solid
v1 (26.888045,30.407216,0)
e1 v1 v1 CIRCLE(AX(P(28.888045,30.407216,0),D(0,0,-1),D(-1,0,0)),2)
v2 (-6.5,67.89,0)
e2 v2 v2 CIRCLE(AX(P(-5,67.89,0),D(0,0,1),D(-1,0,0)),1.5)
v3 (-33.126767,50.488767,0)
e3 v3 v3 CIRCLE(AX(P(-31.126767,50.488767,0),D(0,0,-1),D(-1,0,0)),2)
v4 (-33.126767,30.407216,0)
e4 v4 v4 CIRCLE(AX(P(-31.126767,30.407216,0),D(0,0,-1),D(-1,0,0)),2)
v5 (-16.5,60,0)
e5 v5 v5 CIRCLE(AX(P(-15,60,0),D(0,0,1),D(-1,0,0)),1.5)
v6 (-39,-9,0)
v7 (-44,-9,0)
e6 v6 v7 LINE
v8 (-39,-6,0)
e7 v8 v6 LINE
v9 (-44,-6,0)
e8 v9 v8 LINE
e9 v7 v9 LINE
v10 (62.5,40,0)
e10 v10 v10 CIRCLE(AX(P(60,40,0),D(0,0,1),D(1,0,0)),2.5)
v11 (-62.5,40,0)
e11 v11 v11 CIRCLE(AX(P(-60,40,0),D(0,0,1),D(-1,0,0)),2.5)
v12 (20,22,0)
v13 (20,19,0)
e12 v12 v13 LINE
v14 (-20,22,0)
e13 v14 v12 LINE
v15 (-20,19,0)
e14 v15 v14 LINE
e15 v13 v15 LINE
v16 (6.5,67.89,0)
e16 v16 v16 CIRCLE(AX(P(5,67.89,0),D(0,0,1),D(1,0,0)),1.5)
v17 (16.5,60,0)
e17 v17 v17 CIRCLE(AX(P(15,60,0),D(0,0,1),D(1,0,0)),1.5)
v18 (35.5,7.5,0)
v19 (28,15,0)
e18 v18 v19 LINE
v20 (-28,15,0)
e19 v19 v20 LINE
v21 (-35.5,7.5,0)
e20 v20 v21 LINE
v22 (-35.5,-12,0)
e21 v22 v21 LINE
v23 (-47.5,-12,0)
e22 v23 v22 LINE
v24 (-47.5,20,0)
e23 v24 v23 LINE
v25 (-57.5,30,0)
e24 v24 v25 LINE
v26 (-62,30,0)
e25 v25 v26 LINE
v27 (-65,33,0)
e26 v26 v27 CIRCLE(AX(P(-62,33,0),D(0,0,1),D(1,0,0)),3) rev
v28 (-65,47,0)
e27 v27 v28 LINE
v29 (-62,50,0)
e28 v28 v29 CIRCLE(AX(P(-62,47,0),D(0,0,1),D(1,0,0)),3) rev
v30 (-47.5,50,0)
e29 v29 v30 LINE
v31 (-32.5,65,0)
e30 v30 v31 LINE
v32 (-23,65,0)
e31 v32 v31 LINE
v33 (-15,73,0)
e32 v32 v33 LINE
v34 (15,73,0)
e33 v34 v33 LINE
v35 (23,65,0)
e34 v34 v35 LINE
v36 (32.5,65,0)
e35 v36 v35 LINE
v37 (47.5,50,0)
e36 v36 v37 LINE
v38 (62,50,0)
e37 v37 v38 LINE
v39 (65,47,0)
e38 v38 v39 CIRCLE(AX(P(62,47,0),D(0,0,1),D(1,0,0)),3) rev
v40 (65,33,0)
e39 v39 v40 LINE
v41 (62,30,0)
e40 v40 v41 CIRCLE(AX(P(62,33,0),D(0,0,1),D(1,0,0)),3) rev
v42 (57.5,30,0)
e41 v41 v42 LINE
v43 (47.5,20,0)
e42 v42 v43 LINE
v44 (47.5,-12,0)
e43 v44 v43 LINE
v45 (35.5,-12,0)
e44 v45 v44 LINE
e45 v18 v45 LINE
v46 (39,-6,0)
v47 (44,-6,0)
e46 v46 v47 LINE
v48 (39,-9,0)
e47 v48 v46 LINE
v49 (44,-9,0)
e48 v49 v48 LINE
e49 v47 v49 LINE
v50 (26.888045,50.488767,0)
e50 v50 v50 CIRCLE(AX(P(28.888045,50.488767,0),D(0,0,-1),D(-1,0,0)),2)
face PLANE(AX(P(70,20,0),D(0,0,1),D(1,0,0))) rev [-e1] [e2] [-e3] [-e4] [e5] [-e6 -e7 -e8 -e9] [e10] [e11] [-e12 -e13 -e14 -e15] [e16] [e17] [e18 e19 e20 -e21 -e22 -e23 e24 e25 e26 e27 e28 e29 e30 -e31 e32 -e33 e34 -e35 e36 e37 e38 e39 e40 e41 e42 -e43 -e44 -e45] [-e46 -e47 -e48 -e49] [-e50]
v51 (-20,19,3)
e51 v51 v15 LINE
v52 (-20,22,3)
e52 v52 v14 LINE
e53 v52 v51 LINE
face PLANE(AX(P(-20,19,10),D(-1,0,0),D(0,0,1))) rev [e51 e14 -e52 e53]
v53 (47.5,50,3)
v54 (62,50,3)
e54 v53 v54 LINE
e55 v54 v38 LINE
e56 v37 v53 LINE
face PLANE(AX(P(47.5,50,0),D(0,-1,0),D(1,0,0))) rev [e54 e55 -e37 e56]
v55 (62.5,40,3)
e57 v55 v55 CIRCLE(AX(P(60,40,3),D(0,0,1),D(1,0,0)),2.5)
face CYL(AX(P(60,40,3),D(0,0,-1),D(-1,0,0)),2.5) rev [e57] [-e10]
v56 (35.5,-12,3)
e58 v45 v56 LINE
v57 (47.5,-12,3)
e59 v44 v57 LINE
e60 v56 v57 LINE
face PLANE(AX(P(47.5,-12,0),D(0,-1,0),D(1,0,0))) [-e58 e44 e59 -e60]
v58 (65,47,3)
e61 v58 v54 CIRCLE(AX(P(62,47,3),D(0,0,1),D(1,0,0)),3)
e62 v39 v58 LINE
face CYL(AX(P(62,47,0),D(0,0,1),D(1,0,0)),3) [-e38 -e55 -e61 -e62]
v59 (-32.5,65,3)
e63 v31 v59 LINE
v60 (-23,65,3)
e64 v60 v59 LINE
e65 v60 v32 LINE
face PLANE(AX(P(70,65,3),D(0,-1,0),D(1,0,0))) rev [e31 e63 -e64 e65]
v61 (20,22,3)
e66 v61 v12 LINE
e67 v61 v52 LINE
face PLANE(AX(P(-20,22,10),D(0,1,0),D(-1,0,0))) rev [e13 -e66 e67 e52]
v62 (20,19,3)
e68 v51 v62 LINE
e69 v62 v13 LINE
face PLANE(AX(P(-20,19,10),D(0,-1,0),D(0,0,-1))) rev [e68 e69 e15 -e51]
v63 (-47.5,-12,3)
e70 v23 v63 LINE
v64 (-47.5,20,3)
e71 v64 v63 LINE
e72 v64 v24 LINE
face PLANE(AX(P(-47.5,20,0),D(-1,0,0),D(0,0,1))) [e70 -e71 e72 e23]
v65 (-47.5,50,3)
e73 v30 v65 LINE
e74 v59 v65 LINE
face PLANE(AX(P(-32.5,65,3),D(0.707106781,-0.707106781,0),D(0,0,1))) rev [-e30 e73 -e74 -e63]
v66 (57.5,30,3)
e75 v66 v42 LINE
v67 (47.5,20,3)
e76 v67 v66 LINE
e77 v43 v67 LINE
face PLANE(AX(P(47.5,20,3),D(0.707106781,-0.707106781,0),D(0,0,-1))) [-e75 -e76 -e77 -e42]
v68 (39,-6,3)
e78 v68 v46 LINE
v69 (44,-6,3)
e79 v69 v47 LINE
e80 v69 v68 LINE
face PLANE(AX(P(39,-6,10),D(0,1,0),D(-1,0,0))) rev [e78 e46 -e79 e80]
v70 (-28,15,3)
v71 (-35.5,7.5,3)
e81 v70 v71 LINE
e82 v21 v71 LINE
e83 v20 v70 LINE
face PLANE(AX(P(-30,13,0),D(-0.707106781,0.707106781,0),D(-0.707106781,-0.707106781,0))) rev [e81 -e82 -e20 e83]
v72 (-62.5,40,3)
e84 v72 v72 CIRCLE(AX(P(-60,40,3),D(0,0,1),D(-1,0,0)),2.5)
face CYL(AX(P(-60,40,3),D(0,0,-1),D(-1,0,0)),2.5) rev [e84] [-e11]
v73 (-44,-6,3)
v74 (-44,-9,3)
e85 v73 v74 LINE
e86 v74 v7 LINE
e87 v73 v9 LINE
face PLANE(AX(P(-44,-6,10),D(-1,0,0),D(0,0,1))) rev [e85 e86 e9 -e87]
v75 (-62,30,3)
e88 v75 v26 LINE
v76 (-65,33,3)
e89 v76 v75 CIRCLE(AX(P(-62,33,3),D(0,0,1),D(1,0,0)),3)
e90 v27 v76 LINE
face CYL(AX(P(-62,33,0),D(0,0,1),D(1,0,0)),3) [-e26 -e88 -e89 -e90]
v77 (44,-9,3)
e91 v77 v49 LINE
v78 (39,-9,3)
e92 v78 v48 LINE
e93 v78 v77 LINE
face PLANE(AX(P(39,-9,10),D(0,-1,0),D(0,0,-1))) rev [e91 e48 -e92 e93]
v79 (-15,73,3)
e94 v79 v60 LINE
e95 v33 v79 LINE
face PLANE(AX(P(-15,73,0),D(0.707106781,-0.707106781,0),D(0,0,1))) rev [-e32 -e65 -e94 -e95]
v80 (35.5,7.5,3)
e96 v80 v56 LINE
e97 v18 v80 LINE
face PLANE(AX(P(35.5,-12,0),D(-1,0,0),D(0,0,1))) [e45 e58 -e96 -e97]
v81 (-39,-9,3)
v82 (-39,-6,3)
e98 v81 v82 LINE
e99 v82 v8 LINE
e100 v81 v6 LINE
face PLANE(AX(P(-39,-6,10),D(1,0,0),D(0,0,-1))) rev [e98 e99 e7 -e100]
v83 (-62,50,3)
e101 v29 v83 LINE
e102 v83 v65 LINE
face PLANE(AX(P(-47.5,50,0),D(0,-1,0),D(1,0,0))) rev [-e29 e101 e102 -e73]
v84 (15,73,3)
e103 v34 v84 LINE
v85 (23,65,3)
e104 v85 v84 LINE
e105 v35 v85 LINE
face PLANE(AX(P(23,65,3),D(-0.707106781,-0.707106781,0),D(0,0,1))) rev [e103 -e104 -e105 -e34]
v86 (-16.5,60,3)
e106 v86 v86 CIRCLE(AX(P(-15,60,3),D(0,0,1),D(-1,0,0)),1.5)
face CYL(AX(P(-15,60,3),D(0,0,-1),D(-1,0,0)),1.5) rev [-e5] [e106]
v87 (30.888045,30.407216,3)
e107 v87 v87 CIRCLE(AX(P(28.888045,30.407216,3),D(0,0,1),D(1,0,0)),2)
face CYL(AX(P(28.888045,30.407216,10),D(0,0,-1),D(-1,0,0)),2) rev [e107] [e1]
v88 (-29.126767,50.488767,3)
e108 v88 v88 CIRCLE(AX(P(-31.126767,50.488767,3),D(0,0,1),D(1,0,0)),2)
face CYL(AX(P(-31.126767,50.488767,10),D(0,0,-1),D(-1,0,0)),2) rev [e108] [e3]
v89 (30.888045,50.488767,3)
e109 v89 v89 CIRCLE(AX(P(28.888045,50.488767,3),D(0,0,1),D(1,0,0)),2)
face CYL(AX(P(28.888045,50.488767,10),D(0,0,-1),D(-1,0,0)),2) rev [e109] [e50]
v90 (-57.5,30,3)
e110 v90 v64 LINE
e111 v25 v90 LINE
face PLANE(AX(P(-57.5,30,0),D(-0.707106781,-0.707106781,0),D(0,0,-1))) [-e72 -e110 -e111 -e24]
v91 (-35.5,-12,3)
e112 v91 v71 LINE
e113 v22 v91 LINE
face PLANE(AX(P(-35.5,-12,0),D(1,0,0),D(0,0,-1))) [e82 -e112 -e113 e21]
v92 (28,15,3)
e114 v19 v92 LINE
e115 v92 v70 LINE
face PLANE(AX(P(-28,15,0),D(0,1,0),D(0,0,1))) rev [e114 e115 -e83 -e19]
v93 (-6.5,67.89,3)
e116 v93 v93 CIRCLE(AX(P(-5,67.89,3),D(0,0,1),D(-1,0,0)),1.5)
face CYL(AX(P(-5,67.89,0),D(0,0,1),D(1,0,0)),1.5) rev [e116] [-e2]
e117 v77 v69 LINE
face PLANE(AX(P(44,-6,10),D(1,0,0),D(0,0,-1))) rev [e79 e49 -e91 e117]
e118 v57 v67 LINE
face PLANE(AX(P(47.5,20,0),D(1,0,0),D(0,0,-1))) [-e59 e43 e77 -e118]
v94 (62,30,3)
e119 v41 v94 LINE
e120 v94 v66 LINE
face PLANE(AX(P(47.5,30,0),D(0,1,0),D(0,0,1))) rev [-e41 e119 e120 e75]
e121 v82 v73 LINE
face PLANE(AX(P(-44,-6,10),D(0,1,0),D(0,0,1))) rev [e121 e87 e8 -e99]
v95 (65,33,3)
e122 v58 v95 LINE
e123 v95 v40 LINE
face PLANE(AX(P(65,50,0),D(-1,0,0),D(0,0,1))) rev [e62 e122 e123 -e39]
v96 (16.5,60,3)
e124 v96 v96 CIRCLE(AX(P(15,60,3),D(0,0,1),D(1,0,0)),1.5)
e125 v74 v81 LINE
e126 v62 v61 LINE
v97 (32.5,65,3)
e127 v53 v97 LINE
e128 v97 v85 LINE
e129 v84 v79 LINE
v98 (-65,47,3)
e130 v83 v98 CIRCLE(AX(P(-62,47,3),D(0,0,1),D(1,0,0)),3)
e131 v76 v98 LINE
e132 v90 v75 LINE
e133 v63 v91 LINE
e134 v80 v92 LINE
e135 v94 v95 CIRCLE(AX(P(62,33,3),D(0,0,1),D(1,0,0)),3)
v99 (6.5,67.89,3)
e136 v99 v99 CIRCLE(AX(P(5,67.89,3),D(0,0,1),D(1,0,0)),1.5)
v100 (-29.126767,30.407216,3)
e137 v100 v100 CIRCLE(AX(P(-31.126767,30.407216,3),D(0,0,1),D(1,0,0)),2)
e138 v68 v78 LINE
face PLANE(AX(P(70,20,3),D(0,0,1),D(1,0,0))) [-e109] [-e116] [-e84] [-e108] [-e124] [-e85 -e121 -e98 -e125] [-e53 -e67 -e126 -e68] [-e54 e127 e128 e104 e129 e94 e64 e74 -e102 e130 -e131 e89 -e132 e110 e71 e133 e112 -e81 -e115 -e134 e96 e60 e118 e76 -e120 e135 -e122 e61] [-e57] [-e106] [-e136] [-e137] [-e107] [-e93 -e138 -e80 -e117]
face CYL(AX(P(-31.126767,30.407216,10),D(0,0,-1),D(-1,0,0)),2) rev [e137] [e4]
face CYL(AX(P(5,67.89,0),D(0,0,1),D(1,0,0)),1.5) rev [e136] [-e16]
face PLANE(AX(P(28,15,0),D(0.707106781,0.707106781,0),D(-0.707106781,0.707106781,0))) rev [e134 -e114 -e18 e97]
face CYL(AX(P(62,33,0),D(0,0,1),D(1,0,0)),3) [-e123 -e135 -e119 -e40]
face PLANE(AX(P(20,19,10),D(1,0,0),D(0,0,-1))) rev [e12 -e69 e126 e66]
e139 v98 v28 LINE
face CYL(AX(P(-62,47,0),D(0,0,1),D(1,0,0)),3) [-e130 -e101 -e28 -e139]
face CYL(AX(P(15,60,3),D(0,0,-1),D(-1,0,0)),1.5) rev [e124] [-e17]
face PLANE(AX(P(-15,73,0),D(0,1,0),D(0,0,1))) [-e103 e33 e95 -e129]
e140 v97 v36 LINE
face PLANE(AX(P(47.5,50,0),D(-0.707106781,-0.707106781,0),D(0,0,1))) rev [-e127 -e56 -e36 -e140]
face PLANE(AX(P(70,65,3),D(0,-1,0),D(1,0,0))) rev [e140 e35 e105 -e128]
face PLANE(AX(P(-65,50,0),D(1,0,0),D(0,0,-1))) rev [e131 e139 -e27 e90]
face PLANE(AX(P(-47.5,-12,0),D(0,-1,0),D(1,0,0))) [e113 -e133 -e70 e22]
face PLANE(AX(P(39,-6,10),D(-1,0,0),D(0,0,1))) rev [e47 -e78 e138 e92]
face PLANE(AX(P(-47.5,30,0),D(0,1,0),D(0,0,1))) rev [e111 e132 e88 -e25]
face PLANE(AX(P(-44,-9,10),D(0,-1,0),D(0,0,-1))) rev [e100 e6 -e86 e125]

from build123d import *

# Parameters (mm, degrees)
SKETCH1_R           = 1.5
SKETCH1_R_2         = 2.5
BOSS_EXTRUDE1_DEPTH = 3
CUT_EXTRUDE1_DEPTH  = 3
FILLET1_R           = 3
CHAMFER4_SIZE       = 15
CHAMFER5_SIZE       = 10
SKETCH13_W          = 30
SKETCH13_H          = 8
BOSS_EXTRUDE5_DEPTH = 3
SKETCH8_W           = 95
SKETCH8_H           = 65.304735008
CUT_EXTRUDE5_DEPTH  = 10
SKETCH11_W          = 95
SKETCH11_H          = 7
BOSS_EXTRUDE3_DEPTH = 3
SKETCH10_R          = 1.5
CUT_EXTRUDE6_DEPTH  = 3
BOSS_EXTRUDE4_DEPTH = 3
CHAMFER6_SIZE       = 8
SKETCH17_R          = 2
CUT_EXTRUDE9_DEPTH  = 10
SKETCH15_W          = 40
SKETCH15_H          = 3
CUT_EXTRUDE8_DEPTH  = 10
BOSS_EXTRUDE6_START = -3
BOSS_EXTRUDE6_DEPTH = 3
SKETCH18_W          = 5
SKETCH18_H          = 3
CUT_EXTRUDE11_DEPTH = 10


with BuildPart() as part:
    # Sketch1 → Boss-Extrude1 (new body)
    with BuildSketch(Plane.XY):
        with BuildLine():
            Line((40.5, -40), (44.5, -40))
            Line((44.5, -40), (47.5, -37))
            Line((47.5, -37), (47.5, 10))
            Line((47.5, 10), (47.5, 15))
            Line((47.5, 15), (52.5, 15))
            Line((52.5, 15), (70, 15))
            ThreePointArc((70, 15), (73.535533906, 16.464466094), (75, 20))
            Line((75, 20), (75, 60))
            ThreePointArc((75, 60), (73.535533906, 63.535533906), (70, 65))
            Line((70, 65), (-70, 65))
            ThreePointArc((-70, 65), (-73.535533906, 63.535533906), (-75, 60))
            Line((-75, 60), (-75, 20))
            ThreePointArc((-75, 20), (-73.535533906, 16.464466094), (-70, 15))
            Line((-70, 15), (-52.5, 15))
            Line((-52.5, 15), (-47.5, 15))
            Line((-47.5, 15), (-47.5, 10))
            Line((-47.5, 10), (-47.5, -37))
            Line((-47.5, -37), (-44.5, -40))
            Line((-44.5, -40), (-40.5, -40))
            Line((-40.5, -40), (-37.5, -37))
            Line((-37.5, -37), (-37.5, 10))
            ThreePointArc((-37.5, 10), (-36.035533906, 13.535533906), (-32.5, 15))
            Line((-32.5, 15), (32.5, 15))
            ThreePointArc((32.5, 15), (36.035533906, 13.535533906), (37.5, 10))
            Line((37.5, 10), (37.5, -37))
            Line((37.5, -37), (40.5, -40))
        make_face()
        with Locations((-42.5, -20)):
            Circle(SKETCH1_R, mode=Mode.SUBTRACT)
        with Locations((-42.5, -35)):
            Circle(SKETCH1_R, mode=Mode.SUBTRACT)
        with Locations((42.5, -20)):
            Circle(SKETCH1_R, mode=Mode.SUBTRACT)
        with Locations((42.5, -35)):
            Circle(SKETCH1_R, mode=Mode.SUBTRACT)
        with Locations((60, 40)):
            Circle(SKETCH1_R_2, mode=Mode.SUBTRACT)
        with Locations((15, 60)):
            Circle(SKETCH1_R, mode=Mode.SUBTRACT)
        with Locations(Location((-15, 60, 0), (0, 0, 180))):
            Circle(SKETCH1_R, mode=Mode.SUBTRACT)
        with Locations(Location((-60, 40, 0), (0, 0, 180))):
            Circle(SKETCH1_R_2, mode=Mode.SUBTRACT)
    extrude(amount=BOSS_EXTRUDE1_DEPTH)

    # Sketch3 → Cut-Extrude1 (cut)
    with BuildSketch(Plane.XY.offset(3)):
        Polygon((65, 50), (65, 30), (47.5, 30), (47.5, 15), (75, 15), (75, 23.034767996), (75, 32.364095159), (75, 65), (47.5, 65), (47.5, 50), align=None)
        Polygon((-47.5, 65), (-75, 65), (-75, 32.364095159), (-75, 23.034767996), (-75, 15), (-47.5, 15), (-47.5, 30), (-65, 30), (-65, 50), (-47.5, 50), align=None)
    extrude(amount=-CUT_EXTRUDE1_DEPTH, mode=Mode.SUBTRACT)

    # Fillet1
    fillet1_edges = [part.edges().sort_by_distance(p)[0] for p in [
        (65, 50, 1.5),
        (65, 30, 1.5),
        (-65, 50, 1.5),
        (-65, 30, 1.5),
    ]]
    fillet(fillet1_edges, radius=FILLET1_R)

    # Chamfer4
    chamfer4_edges = [part.edges().sort_by_distance(p)[0] for p in [
        (47.5, 65, 1.5),
        (-47.5, 65, 1.5),
    ]]
    chamfer(chamfer4_edges, length=CHAMFER4_SIZE - 0.0001)  # a hair under: the kernel refuses the full size

    # Chamfer5
    chamfer5_edges = [part.edges().sort_by_distance(p)[0] for p in [
        (47.5, 30, 1.5),
        (-47.5, 30, 1.5),
    ]]
    chamfer(chamfer5_edges, length=CHAMFER5_SIZE)

    # Sketch13 → Boss-Extrude5 (add)
    with BuildSketch(Plane.XY.offset(3)):
        with Locations((0, 69)):
            Rectangle(SKETCH13_W, SKETCH13_H)
    extrude(amount=-BOSS_EXTRUDE5_DEPTH)

    # Sketch8 → Cut-Extrude5 (cut)
    with BuildSketch(Plane.XY.offset(3)):
        with Locations((0, -12.652367504)):
            Rectangle(SKETCH8_W, SKETCH8_H)
    extrude(amount=-CUT_EXTRUDE5_DEPTH, mode=Mode.SUBTRACT)

    # Sketch11 → Boss-Extrude3 (add)
    with BuildSketch(Plane.XY.offset(3)):
        with Locations((0, 16.5)):
            Rectangle(SKETCH11_W, SKETCH11_H)
    extrude(amount=-BOSS_EXTRUDE3_DEPTH)

    # Sketch10 → Cut-Extrude6 (cut)
    with BuildSketch(Plane.XY.offset(3)):
        with Locations((5, 67.89)):
            Circle(SKETCH10_R)
        with Locations(Location((-5, 67.89, 0), (0, 0, 180))):
            Circle(SKETCH10_R)
        with Locations((-5, 18.11)):
            Circle(SKETCH10_R)
        with Locations(Location((5, 18.11, 0), (0, 0, 180))):
            Circle(SKETCH10_R)
        Polygon((-30, 13), (-28, 15), (28, 15), (30, 13), align=None)
    extrude(amount=-CUT_EXTRUDE6_DEPTH, mode=Mode.SUBTRACT)

    # Sketch12 → Boss-Extrude4 (add)
    with BuildSketch(Plane.XY.offset(3)):
        Polygon((47.5, 13), (47.5, -12), (35.5, -12), (35.5, 7.5), (30, 13), (35.5, 13), align=None)
        Polygon((-35.5, 13), (-47.5, 13), (-47.5, -12), (-35.5, -12), (-35.5, 7.5), (-30, 13), align=None)
    extrude(amount=-BOSS_EXTRUDE4_DEPTH)

    # Chamfer6
    chamfer6_edges = [part.edges().sort_by_distance(p)[0] for p in [
        (15, 65, 1.5),
        (-15, 65, 1.5),
    ]]
    chamfer(chamfer6_edges, length=CHAMFER6_SIZE - 0.0001)  # a hair under: the kernel refuses the full size

    # Sketch17 → Cut-Extrude9 (cut)
    with BuildSketch(Plane(origin=(0, 0, 0), x_dir=(-1, 0, 0), z_dir=(0, 0, -1))):
        with Locations((-28.88804467, 50.488766948)):
            Circle(SKETCH17_R)
        with Locations((-28.88804467, 30.407216077)):
            Circle(SKETCH17_R)
        with Locations((31.126767325, 30.407216077)):
            Circle(SKETCH17_R)
        with Locations((31.126767325, 50.488766948)):
            Circle(SKETCH17_R)
    extrude(amount=-CUT_EXTRUDE9_DEPTH, mode=Mode.SUBTRACT)

    # Sketch15 → Cut-Extrude8 (cut)
    with BuildSketch(Plane(origin=(0, 0, 0), x_dir=(-1, 0, 0), z_dir=(0, 0, -1))):
        with Locations((0, 20.5)):
            Rectangle(SKETCH15_W, SKETCH15_H)
    extrude(amount=-CUT_EXTRUDE8_DEPTH, mode=Mode.SUBTRACT)

    # Sketch16 → Boss-Extrude6 (add)
    with BuildSketch(Plane(origin=(0, 0, 0), x_dir=(-1, 0, 0), z_dir=(0, 0, -1)).offset(BOSS_EXTRUDE6_START)):
        with BuildLine():
            Line((3.792564702, 19), (6.207435298, 19))
            ThreePointArc((6.207435298, 19), (5, 16.61), (3.792564702, 19))
        make_face()
        with BuildLine():
            Line((-6.207435298, 19), (-3.792564702, 19))
            ThreePointArc((-3.792564702, 19), (-5, 16.61), (-6.207435298, 19))
        make_face()
    extrude(amount=BOSS_EXTRUDE6_DEPTH)

    # Sketch18 → Cut-Extrude11 (cut)
    with BuildSketch(Plane(origin=(0, 0, 0), x_dir=(-1, 0, 0), z_dir=(0, 0, -1))):
        with Locations((-131.776111861, 19.947341704)):
            Rectangle(SKETCH18_W, SKETCH18_H)
        with Locations((-41.5, -7.5)):
            Rectangle(SKETCH18_W, SKETCH18_H)
        with Locations((41.5, -7.5)):
            Rectangle(SKETCH18_W, SKETCH18_H)
    extrude(amount=-CUT_EXTRUDE11_DEPTH, mode=Mode.SUBTRACT)


solid = part.part
